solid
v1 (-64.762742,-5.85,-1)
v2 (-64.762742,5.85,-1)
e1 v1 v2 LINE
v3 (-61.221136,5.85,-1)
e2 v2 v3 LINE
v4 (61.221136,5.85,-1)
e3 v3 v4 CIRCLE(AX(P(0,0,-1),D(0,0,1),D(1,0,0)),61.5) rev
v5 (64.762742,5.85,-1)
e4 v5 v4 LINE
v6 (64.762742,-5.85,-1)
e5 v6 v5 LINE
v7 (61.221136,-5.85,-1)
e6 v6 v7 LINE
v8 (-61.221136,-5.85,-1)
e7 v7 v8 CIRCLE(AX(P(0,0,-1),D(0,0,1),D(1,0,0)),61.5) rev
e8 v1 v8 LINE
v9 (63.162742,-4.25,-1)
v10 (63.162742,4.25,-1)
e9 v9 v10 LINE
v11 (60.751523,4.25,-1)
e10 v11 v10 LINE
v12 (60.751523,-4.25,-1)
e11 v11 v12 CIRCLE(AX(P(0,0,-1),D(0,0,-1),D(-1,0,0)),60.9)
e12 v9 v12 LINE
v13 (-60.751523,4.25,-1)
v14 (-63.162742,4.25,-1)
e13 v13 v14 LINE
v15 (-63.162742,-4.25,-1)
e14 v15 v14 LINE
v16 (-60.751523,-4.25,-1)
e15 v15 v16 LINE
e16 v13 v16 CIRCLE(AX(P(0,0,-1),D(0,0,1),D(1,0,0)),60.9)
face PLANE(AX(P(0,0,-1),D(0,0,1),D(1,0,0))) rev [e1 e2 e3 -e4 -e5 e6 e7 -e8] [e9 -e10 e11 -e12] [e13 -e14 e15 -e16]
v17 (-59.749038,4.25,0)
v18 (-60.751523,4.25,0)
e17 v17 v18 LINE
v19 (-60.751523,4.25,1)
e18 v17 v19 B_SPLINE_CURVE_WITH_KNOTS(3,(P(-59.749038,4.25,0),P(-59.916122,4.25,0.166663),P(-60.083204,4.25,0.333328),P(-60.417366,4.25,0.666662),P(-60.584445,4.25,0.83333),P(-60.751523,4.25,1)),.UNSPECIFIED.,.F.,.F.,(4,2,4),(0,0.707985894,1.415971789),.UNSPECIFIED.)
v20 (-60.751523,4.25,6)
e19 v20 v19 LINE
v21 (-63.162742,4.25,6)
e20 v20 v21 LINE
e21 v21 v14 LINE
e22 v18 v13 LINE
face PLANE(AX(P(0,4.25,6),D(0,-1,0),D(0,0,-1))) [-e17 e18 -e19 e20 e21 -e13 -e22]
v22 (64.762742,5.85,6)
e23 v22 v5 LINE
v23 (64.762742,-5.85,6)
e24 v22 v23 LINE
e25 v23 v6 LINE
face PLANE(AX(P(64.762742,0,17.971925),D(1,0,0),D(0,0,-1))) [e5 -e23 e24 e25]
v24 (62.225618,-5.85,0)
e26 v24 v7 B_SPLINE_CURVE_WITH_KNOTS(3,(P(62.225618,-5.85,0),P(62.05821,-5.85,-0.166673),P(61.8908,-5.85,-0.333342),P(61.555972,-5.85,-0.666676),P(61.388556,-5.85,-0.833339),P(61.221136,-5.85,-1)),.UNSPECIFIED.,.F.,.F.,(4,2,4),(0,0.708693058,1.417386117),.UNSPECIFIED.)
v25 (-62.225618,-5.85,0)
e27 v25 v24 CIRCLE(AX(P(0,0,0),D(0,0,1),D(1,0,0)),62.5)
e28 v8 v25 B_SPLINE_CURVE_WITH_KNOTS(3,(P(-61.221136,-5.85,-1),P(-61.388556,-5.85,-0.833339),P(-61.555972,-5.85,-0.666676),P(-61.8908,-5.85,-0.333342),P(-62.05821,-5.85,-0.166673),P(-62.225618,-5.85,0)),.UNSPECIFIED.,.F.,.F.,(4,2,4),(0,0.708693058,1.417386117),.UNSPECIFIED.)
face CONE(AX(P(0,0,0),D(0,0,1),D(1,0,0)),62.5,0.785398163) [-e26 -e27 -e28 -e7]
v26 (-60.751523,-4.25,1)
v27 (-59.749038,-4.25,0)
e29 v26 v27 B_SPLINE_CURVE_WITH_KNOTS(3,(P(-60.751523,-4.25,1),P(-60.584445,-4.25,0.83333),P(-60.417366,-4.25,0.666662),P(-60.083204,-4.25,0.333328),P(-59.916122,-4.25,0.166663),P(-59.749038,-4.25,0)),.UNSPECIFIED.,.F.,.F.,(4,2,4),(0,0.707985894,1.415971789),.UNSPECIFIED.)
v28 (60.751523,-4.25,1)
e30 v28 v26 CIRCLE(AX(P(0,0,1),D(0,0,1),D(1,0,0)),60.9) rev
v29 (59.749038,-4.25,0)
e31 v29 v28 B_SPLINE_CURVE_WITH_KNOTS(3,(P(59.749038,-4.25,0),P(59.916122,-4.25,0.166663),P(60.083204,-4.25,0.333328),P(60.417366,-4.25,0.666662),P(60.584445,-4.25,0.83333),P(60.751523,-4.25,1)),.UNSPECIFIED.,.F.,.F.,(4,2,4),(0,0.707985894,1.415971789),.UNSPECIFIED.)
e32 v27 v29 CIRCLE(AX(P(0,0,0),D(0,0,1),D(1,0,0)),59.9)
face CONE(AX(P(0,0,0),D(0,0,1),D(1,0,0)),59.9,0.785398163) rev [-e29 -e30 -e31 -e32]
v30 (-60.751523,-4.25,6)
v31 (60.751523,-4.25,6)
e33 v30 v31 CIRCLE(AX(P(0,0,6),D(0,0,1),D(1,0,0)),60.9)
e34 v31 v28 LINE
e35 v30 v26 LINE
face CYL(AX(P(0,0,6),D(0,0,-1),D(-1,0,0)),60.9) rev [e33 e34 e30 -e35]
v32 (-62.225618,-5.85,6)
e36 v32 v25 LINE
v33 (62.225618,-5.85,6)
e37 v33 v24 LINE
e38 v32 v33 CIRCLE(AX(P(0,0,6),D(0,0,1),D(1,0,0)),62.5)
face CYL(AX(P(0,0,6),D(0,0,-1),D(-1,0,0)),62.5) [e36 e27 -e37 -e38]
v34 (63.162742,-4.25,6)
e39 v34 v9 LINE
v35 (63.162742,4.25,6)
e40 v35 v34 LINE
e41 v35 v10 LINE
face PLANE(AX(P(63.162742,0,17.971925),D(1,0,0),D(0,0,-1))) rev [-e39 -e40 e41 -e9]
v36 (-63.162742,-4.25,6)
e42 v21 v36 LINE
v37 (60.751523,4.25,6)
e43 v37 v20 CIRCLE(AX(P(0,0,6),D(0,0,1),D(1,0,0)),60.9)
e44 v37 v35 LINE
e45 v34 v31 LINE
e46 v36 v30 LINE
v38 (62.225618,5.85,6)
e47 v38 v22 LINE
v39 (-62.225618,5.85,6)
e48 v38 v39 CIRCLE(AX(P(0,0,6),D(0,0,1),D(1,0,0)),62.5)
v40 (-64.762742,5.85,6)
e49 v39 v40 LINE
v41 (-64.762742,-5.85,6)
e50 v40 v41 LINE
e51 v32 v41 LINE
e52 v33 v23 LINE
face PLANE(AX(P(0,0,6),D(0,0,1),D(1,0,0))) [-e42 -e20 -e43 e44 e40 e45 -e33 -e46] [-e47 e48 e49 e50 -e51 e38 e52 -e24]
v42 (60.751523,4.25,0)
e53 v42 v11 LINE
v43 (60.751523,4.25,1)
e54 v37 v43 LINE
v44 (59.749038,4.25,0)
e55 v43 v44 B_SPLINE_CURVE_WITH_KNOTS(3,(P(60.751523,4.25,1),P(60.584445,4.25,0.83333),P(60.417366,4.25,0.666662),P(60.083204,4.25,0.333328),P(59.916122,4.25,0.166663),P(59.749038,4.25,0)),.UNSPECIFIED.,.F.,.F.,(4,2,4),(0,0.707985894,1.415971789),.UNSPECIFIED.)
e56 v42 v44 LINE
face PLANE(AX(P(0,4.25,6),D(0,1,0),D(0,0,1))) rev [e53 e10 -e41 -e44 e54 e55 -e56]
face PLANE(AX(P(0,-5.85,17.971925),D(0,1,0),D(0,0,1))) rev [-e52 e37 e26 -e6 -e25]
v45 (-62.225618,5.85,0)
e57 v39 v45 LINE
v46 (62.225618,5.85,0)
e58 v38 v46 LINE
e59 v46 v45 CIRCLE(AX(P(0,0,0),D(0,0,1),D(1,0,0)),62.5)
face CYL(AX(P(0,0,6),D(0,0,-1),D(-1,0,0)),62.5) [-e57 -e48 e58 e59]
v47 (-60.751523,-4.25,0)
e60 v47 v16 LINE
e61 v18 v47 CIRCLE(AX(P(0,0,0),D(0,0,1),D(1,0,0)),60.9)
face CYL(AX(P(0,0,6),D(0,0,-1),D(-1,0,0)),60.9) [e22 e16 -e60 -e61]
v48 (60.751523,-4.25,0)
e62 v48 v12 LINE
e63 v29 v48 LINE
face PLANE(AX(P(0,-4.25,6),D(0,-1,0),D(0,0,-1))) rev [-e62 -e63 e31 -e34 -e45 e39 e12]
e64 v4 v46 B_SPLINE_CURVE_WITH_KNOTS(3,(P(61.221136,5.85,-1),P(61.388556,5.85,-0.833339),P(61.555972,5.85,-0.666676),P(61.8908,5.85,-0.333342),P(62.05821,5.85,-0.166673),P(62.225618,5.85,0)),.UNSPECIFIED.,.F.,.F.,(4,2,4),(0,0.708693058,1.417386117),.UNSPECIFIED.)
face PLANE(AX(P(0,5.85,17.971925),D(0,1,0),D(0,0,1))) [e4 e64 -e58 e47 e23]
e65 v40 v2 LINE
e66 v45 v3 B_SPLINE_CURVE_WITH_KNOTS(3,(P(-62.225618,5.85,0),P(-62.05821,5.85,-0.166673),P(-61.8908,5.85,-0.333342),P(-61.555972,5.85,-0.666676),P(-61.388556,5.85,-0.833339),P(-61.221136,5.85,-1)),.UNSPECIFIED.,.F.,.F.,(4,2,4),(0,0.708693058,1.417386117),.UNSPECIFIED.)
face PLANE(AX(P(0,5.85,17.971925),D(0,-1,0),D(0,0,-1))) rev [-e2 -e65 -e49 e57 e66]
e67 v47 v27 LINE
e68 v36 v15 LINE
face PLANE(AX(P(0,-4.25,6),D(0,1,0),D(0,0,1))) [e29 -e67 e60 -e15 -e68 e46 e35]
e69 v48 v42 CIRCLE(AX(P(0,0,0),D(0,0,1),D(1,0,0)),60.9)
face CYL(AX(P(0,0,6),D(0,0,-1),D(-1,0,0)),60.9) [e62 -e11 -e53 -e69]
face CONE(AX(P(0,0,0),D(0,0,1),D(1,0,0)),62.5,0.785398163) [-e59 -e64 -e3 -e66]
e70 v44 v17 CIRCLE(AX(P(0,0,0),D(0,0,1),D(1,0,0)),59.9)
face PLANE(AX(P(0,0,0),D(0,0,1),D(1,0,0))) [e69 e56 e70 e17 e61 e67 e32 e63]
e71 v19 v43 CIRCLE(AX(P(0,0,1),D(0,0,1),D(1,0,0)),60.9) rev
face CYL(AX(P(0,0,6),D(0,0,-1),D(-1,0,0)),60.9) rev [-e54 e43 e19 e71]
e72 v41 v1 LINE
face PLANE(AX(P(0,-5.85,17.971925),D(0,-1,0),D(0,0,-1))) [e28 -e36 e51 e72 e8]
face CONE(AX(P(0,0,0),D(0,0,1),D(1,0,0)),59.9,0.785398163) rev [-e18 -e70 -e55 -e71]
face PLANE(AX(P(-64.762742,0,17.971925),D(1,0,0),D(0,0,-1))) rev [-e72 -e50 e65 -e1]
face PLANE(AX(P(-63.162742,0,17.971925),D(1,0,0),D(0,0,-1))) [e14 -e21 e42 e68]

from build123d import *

# Parameters (mm, degrees)
BOSS_EXTRUDE1_DEPTH = 6
BOSS_EXTRUDE2_START = -1
SKETCH1_2_R         = 62.5
BOSS_EXTRUDE2_DEPTH = 1
CUT_EXTRUDE1_DEPTH  = 89.591760339
BOSS_EXTRUDE3_START = -1
BOSS_EXTRUDE3_DEPTH = 7
CHAMFER1_SIZE       = 1


with BuildPart() as part:
    # Sketch1 → Boss-Extrude1 (new body)
    with BuildSketch(Plane.XY):
        with BuildLine():
            ThreePointArc((-60.751522615, -4.25), (-60.9, 0), (-60.751522615, 4.25))
            Line((-60.751522615, 4.25), (-62.355332571, 4.25))
            ThreePointArc((-62.355332571, 4.25), (-62.5, 0), (-62.355332571, -4.25))
            Line((-62.355332571, -4.25), (-60.751522615, -4.25))
        make_face()
        with BuildLine():
            Line((-62.355332571, 4.25), (-60.751522615, 4.25))
            ThreePointArc((-60.751522615, 4.25), (2.126296401, 60.862869334), (60.9, 0))
            ThreePointArc((60.9, 0), (2.126296401, -60.862869334), (-60.751522615, -4.25))
            Line((-60.751522615, -4.25), (-62.355332571, -4.25))
            ThreePointArc((-62.355332571, -4.25), (-62.295612153, -5.050416467), (-62.225617715, -5.85))
            ThreePointArc((-62.225617715, -5.85), (2.928215567, -62.431366745), (62.5, 0))
            ThreePointArc((62.5, 0), (2.928215567, 62.431366745), (-62.225617715, 5.85))
            ThreePointArc((-62.225617715, 5.85), (-62.295612153, 5.050416467), (-62.355332571, 4.25))
        make_face()
    extrude(amount=BOSS_EXTRUDE1_DEPTH)

    # Sketch1<2> → Boss-Extrude2 (add)
    with BuildSketch(Plane.XY.offset(BOSS_EXTRUDE2_START)):
        Circle(SKETCH1_2_R)
    extrude(amount=BOSS_EXTRUDE2_DEPTH)

    # Sketch1<4> → Cut-Extrude1 (cut, symmetric)
    with BuildSketch(Plane.XY):
        with BuildLine():
            ThreePointArc((-60.751522615, -4.25), (-60.9, 0), (-60.751522615, 4.25))
            Line((-60.751522615, 4.25), (-62.355332571, 4.25))
            ThreePointArc((-62.355332571, 4.25), (-62.5, 0), (-62.355332571, -4.25))
            Line((-62.355332571, -4.25), (-60.751522615, -4.25))
        make_face()
    cut_extrude1 = extrude(amount=CUT_EXTRUDE1_DEPTH, both=True, mode=Mode.SUBTRACT)

    # Sketch1<5> → Boss-Extrude3 (add)
    with BuildSketch(Plane.XY.offset(BOSS_EXTRUDE3_START)):
        with BuildLine():
            Line((-63.1627417, 4.25), (-62.355332571, 4.25))
            ThreePointArc((-62.355332571, 4.25), (-62.295612153, 5.050416467), (-62.225617715, 5.85))
            Line((-62.225617715, 5.85), (-64.7627417, 5.85))
            Line((-64.7627417, 5.85), (-64.7627417, -5.85))
            Line((-64.7627417, -5.85), (-62.225617715, -5.85))
            ThreePointArc((-62.225617715, -5.85), (-62.295612153, -5.050416467), (-62.355332571, -4.25))
            Line((-62.355332571, -4.25), (-63.1627417, -4.25))
            Line((-63.1627417, -4.25), (-63.1627417, 4.25))
        make_face()
    boss_extrude3 = extrude(amount=BOSS_EXTRUDE3_DEPTH)

    # Mirror1: Cut-Extrude1, Boss-Extrude3 across plane
    add(cut_extrude1.mirror(Plane(origin=(0, 0, 0), x_dir=(0, 0, 1), z_dir=(1, 0, 0))), mode=Mode.SUBTRACT)
    add(boss_extrude3.mirror(Plane(origin=(0, 0, 0), x_dir=(0, 0, 1), z_dir=(1, 0, 0))))

    # Chamfer1
    chamfer1_edges = [part.edges().sort_by_distance(p)[0] for p in [
        (0, -60.9, 0),
        (0, -62.5, -1),
        (0, 60.9, 0),
        (0, 62.5, -1),
    ]]
    chamfer(chamfer1_edges, length=CHAMFER1_SIZE - 0.0001)  # a hair under: the kernel refuses the full size


solid = part.part
